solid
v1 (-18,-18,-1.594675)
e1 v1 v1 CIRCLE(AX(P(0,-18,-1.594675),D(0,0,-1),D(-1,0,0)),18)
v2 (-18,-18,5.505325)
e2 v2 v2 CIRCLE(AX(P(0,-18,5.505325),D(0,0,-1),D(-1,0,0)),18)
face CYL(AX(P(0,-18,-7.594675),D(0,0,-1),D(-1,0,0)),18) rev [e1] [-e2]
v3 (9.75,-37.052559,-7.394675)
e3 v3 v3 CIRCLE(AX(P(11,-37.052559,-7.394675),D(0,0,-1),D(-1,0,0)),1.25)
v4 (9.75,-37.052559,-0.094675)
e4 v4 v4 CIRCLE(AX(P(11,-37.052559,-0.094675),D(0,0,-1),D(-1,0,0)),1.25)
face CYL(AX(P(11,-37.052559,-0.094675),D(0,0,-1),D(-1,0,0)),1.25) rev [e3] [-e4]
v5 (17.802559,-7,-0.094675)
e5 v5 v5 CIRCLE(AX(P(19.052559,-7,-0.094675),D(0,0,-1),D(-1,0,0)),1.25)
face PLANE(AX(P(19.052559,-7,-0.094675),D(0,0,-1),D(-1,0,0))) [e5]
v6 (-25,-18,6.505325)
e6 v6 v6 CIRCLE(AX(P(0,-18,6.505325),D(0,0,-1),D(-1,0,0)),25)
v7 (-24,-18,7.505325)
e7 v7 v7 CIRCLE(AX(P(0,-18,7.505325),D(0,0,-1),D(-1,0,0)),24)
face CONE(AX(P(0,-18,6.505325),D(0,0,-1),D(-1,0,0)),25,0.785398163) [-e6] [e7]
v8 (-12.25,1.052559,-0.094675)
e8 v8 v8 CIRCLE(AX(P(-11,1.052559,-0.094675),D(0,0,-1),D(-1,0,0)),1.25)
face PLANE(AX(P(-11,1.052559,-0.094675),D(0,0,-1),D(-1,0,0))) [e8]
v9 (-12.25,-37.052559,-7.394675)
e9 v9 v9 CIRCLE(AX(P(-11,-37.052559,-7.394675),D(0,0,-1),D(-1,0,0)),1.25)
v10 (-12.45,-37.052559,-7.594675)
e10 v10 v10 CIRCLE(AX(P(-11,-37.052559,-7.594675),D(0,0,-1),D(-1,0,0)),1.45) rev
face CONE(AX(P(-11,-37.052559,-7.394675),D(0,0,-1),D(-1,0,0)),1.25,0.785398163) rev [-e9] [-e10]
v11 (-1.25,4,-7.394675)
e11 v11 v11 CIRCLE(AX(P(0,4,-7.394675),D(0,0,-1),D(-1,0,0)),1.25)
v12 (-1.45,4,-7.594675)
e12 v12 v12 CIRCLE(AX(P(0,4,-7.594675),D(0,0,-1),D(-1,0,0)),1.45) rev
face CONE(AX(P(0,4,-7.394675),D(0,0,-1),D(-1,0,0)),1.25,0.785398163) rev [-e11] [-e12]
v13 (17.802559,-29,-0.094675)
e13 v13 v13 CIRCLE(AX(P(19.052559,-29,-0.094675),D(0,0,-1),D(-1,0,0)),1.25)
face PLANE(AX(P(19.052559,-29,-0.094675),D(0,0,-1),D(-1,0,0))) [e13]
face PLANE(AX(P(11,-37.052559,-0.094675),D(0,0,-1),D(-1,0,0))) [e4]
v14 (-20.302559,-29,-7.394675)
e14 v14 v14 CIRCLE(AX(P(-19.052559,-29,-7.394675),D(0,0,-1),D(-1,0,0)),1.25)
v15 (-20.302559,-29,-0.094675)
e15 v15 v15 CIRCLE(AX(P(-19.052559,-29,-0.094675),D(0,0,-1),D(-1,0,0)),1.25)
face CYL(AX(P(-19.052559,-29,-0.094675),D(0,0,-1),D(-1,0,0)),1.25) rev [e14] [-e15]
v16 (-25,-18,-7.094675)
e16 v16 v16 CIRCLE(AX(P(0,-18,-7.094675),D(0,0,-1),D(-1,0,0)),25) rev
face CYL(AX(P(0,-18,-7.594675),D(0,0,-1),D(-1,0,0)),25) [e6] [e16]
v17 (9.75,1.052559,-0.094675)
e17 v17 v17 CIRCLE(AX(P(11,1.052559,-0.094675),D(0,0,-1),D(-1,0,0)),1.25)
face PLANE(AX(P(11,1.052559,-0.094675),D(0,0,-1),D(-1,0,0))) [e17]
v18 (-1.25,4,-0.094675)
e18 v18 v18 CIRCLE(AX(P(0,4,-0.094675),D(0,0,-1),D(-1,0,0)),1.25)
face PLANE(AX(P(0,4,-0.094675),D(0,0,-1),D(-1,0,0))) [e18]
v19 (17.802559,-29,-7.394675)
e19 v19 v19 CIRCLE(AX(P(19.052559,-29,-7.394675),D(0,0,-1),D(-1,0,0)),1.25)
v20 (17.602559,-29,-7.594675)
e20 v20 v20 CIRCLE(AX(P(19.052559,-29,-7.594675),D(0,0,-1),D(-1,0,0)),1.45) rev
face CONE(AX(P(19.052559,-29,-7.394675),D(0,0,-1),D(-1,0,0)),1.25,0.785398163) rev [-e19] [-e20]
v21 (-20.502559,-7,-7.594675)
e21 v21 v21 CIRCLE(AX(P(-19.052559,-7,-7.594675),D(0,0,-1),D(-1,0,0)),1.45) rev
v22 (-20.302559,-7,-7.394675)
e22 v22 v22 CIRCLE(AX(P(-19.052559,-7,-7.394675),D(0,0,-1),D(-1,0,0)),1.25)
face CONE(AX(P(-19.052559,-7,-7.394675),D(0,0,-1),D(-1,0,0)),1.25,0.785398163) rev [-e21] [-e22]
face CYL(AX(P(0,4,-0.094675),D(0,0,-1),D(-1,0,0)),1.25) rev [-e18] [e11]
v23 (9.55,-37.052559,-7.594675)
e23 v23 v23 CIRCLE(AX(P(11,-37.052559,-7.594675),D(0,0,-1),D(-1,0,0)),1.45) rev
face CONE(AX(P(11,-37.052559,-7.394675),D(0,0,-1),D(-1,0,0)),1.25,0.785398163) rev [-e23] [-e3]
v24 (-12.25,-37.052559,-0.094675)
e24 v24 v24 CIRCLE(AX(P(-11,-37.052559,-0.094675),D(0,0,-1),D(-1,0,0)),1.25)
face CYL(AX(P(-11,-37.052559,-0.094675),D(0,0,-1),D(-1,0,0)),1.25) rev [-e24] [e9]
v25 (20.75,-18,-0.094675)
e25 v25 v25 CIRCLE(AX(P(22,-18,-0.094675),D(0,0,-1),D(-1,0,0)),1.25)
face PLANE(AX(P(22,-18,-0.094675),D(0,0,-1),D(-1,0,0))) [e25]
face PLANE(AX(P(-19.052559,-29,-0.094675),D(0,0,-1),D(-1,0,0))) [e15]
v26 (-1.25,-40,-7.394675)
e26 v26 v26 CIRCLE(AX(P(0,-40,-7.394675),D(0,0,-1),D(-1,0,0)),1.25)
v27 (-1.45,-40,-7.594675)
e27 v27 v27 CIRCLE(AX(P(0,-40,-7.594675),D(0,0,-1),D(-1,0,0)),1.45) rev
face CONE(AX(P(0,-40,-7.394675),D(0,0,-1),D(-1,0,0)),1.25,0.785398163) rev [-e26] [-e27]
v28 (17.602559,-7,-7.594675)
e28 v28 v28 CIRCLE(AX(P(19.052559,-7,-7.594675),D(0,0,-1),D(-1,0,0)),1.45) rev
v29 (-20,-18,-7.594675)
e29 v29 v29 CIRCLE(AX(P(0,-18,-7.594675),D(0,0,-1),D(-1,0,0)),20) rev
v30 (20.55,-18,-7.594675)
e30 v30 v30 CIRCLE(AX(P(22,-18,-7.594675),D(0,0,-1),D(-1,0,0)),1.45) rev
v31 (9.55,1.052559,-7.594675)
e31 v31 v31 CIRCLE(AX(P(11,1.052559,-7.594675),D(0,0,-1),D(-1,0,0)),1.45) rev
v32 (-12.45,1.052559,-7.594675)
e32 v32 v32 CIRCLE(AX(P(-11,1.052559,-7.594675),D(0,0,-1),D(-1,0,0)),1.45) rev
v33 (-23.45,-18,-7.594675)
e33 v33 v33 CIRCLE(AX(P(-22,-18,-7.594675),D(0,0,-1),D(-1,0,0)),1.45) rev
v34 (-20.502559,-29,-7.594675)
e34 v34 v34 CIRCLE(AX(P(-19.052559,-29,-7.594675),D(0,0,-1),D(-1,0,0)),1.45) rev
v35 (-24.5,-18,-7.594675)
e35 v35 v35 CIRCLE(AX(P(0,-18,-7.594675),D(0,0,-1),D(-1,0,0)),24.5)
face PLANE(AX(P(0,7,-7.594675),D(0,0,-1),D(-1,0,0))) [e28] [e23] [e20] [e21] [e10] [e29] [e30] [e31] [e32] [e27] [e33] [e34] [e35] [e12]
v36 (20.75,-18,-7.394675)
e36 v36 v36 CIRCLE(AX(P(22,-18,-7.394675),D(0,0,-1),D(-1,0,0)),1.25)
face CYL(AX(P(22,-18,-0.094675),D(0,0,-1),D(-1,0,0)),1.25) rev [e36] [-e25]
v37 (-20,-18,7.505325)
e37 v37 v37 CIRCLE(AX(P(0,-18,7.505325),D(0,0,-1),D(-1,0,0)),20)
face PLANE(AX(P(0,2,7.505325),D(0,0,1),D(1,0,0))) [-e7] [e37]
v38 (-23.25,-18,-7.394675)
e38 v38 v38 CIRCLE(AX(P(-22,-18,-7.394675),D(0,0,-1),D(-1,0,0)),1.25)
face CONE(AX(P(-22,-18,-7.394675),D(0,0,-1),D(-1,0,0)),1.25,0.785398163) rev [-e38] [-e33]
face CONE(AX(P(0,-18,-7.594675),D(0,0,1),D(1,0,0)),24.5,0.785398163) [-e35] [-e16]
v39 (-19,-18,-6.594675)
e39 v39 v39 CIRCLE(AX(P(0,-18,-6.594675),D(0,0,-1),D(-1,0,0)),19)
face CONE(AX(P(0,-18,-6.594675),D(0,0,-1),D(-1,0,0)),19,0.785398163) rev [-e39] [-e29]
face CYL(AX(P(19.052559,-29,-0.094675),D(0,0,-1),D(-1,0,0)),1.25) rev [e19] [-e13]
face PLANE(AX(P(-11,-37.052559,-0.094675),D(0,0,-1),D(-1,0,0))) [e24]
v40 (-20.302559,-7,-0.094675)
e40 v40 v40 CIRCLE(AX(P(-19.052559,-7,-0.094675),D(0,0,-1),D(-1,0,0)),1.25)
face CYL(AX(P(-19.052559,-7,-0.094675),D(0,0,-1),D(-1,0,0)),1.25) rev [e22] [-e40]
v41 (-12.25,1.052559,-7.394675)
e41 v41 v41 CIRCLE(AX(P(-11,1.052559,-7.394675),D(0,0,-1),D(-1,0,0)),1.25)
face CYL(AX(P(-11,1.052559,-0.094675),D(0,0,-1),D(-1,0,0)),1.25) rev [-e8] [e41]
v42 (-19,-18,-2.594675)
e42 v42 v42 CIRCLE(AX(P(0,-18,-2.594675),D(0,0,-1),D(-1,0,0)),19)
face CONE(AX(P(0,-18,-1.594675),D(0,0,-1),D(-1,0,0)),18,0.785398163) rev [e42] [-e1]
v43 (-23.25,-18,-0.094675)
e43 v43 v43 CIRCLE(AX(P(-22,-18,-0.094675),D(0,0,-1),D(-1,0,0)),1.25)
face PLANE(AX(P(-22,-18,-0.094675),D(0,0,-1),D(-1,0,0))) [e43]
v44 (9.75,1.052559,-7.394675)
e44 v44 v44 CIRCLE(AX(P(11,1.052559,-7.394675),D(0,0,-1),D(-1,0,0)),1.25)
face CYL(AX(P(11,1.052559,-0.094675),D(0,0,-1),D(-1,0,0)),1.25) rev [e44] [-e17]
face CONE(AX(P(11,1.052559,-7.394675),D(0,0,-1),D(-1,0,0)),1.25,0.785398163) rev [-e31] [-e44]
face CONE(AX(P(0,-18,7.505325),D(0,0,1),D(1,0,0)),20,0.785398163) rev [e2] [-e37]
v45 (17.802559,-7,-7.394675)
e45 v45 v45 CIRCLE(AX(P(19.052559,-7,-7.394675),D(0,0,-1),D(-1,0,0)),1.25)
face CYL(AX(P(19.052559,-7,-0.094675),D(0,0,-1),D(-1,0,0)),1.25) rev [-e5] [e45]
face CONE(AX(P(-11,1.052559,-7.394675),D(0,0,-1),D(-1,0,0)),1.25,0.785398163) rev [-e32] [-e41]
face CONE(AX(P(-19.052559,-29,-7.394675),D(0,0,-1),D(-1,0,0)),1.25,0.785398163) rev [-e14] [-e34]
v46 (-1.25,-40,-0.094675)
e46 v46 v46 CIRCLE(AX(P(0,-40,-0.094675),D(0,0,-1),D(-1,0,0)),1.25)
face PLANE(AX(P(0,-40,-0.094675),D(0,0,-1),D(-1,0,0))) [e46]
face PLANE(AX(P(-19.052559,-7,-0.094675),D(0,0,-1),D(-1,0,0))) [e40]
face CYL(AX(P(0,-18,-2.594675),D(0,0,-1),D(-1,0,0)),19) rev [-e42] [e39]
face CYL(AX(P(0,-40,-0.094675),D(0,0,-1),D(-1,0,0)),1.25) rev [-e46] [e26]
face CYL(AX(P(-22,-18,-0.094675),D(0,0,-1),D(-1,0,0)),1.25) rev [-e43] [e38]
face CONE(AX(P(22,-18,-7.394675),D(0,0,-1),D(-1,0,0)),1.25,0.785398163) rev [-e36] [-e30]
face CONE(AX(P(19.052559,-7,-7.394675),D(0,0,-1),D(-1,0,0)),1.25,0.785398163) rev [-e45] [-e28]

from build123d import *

# Parameters (mm, degrees)
CROQUIS4_R            = 19
CORTAR_EXTRUIR1_DEPTH = 5
CHAFL_N1_SIZE         = 1
CHAFL_N2_SIZE         = 0.5
CHAFL_N3_SIZE         = 1
CROQUIS5_R            = 1.25
CORTAR_EXTRUIR2_DEPTH = 7.5
CHAFL_N4_SIZE         = 0.2


with BuildPart() as part:
    # Croquis1 → Revolución2 (revolve)
    with BuildSketch(Plane(origin=(0, 0, 0), x_dir=(0, 0, -1), z_dir=(1, 0, 0)), mode=Mode.PRIVATE) as revoluci_n2_sk:
        Polygon((-5.505325444, 0), (7.594674556, 0), (7.594674556, 7), (-6.505325444, 7), (-7.505325444, 6), (-7.505325444, 2), align=None)
    revolve(revoluci_n2_sk.sketch.rotate(Axis((0, -18, -7.594674556), (0, 0, 1)), 90), axis=Axis((0, -18, -7.594674556), (0, 0, 1)))

    # Croquis4 → Cortar-Extruir1 (cut)
    with BuildSketch(Plane(origin=(0, 0, -7.594674556), x_dir=(-1, 0, 0), z_dir=(0, 0, -1))):
        with Locations((0, -18)):
            Circle(CROQUIS4_R)
    extrude(amount=-CORTAR_EXTRUIR1_DEPTH, mode=Mode.SUBTRACT)

    # Chaflán1
    chafl_n1_edges = [part.edges().sort_by_distance(p)[0] for p in [
        (18, -18, -2.594674556),
    ]]
    chamfer(chafl_n1_edges, length=CHAFL_N1_SIZE - 0.0001)  # a hair under: the kernel refuses the full size

    # Chaflán2
    chafl_n2_edges = [part.edges().sort_by_distance(p)[0] for p in [
        (25, -18, -7.594674556),
    ]]
    chamfer(chafl_n2_edges, length=CHAFL_N2_SIZE)

    # Chaflán3
    chafl_n3_edges = [part.edges().sort_by_distance(p)[0] for p in [
        (19, -18, -7.594674556),
    ]]
    chamfer(chafl_n3_edges, length=CHAFL_N3_SIZE)

    # Croquis5 → Cortar-Extruir2 (cut)
    with BuildSketch(Plane(origin=(0, 0, -7.594674556), x_dir=(-1, 0, 0), z_dir=(0, 0, -1))):
        with Locations((0, 4)):
            Circle(CROQUIS5_R)
        with Locations((11, 1.052558883)):
            Circle(CROQUIS5_R)
        with Locations((19.052558883, -7)):
            Circle(CROQUIS5_R)
        with Locations((22, -18)):
            Circle(CROQUIS5_R)
        with Locations((19.052558883, -29)):
            Circle(CROQUIS5_R)
        with Locations((11, -37.052558883)):
            Circle(CROQUIS5_R)
        with Locations((0, -40)):
            Circle(CROQUIS5_R)
        with Locations((-11, -37.052558883)):
            Circle(CROQUIS5_R)
        with Locations((-19.052558883, -29)):
            Circle(CROQUIS5_R)
        with Locations((-22, -18)):
            Circle(CROQUIS5_R)
        with Locations((-19.052558883, -7)):
            Circle(CROQUIS5_R)
        with Locations((-11, 1.052558883)):
            Circle(CROQUIS5_R)
    extrude(amount=-CORTAR_EXTRUIR2_DEPTH, mode=Mode.SUBTRACT)

    # Chaflán4
    chafl_n4_edges = [part.edges().sort_by_distance(p)[0] for p in [
        (1.25, 4, -7.594674556),
        (12.25, 1.052558883, -7.594674556),
        (20.302558883, -7, -7.594674556),
        (23.25, -18, -7.594674556),
        (-9.75, 1.052558883, -7.594674556),
        (-17.802558883, -7, -7.594674556),
        (-20.75, -18, -7.594674556),
        (-17.802558883, -29, -7.594674556),
        (-9.75, -37.052558883, -7.594674556),
        (1.25, -40, -7.594674556),
        (12.25, -37.052558883, -7.594674556),
        (20.302558883, -29, -7.594674556),
    ]]
    chamfer(chafl_n4_edges, length=CHAFL_N4_SIZE)


solid = part.part
